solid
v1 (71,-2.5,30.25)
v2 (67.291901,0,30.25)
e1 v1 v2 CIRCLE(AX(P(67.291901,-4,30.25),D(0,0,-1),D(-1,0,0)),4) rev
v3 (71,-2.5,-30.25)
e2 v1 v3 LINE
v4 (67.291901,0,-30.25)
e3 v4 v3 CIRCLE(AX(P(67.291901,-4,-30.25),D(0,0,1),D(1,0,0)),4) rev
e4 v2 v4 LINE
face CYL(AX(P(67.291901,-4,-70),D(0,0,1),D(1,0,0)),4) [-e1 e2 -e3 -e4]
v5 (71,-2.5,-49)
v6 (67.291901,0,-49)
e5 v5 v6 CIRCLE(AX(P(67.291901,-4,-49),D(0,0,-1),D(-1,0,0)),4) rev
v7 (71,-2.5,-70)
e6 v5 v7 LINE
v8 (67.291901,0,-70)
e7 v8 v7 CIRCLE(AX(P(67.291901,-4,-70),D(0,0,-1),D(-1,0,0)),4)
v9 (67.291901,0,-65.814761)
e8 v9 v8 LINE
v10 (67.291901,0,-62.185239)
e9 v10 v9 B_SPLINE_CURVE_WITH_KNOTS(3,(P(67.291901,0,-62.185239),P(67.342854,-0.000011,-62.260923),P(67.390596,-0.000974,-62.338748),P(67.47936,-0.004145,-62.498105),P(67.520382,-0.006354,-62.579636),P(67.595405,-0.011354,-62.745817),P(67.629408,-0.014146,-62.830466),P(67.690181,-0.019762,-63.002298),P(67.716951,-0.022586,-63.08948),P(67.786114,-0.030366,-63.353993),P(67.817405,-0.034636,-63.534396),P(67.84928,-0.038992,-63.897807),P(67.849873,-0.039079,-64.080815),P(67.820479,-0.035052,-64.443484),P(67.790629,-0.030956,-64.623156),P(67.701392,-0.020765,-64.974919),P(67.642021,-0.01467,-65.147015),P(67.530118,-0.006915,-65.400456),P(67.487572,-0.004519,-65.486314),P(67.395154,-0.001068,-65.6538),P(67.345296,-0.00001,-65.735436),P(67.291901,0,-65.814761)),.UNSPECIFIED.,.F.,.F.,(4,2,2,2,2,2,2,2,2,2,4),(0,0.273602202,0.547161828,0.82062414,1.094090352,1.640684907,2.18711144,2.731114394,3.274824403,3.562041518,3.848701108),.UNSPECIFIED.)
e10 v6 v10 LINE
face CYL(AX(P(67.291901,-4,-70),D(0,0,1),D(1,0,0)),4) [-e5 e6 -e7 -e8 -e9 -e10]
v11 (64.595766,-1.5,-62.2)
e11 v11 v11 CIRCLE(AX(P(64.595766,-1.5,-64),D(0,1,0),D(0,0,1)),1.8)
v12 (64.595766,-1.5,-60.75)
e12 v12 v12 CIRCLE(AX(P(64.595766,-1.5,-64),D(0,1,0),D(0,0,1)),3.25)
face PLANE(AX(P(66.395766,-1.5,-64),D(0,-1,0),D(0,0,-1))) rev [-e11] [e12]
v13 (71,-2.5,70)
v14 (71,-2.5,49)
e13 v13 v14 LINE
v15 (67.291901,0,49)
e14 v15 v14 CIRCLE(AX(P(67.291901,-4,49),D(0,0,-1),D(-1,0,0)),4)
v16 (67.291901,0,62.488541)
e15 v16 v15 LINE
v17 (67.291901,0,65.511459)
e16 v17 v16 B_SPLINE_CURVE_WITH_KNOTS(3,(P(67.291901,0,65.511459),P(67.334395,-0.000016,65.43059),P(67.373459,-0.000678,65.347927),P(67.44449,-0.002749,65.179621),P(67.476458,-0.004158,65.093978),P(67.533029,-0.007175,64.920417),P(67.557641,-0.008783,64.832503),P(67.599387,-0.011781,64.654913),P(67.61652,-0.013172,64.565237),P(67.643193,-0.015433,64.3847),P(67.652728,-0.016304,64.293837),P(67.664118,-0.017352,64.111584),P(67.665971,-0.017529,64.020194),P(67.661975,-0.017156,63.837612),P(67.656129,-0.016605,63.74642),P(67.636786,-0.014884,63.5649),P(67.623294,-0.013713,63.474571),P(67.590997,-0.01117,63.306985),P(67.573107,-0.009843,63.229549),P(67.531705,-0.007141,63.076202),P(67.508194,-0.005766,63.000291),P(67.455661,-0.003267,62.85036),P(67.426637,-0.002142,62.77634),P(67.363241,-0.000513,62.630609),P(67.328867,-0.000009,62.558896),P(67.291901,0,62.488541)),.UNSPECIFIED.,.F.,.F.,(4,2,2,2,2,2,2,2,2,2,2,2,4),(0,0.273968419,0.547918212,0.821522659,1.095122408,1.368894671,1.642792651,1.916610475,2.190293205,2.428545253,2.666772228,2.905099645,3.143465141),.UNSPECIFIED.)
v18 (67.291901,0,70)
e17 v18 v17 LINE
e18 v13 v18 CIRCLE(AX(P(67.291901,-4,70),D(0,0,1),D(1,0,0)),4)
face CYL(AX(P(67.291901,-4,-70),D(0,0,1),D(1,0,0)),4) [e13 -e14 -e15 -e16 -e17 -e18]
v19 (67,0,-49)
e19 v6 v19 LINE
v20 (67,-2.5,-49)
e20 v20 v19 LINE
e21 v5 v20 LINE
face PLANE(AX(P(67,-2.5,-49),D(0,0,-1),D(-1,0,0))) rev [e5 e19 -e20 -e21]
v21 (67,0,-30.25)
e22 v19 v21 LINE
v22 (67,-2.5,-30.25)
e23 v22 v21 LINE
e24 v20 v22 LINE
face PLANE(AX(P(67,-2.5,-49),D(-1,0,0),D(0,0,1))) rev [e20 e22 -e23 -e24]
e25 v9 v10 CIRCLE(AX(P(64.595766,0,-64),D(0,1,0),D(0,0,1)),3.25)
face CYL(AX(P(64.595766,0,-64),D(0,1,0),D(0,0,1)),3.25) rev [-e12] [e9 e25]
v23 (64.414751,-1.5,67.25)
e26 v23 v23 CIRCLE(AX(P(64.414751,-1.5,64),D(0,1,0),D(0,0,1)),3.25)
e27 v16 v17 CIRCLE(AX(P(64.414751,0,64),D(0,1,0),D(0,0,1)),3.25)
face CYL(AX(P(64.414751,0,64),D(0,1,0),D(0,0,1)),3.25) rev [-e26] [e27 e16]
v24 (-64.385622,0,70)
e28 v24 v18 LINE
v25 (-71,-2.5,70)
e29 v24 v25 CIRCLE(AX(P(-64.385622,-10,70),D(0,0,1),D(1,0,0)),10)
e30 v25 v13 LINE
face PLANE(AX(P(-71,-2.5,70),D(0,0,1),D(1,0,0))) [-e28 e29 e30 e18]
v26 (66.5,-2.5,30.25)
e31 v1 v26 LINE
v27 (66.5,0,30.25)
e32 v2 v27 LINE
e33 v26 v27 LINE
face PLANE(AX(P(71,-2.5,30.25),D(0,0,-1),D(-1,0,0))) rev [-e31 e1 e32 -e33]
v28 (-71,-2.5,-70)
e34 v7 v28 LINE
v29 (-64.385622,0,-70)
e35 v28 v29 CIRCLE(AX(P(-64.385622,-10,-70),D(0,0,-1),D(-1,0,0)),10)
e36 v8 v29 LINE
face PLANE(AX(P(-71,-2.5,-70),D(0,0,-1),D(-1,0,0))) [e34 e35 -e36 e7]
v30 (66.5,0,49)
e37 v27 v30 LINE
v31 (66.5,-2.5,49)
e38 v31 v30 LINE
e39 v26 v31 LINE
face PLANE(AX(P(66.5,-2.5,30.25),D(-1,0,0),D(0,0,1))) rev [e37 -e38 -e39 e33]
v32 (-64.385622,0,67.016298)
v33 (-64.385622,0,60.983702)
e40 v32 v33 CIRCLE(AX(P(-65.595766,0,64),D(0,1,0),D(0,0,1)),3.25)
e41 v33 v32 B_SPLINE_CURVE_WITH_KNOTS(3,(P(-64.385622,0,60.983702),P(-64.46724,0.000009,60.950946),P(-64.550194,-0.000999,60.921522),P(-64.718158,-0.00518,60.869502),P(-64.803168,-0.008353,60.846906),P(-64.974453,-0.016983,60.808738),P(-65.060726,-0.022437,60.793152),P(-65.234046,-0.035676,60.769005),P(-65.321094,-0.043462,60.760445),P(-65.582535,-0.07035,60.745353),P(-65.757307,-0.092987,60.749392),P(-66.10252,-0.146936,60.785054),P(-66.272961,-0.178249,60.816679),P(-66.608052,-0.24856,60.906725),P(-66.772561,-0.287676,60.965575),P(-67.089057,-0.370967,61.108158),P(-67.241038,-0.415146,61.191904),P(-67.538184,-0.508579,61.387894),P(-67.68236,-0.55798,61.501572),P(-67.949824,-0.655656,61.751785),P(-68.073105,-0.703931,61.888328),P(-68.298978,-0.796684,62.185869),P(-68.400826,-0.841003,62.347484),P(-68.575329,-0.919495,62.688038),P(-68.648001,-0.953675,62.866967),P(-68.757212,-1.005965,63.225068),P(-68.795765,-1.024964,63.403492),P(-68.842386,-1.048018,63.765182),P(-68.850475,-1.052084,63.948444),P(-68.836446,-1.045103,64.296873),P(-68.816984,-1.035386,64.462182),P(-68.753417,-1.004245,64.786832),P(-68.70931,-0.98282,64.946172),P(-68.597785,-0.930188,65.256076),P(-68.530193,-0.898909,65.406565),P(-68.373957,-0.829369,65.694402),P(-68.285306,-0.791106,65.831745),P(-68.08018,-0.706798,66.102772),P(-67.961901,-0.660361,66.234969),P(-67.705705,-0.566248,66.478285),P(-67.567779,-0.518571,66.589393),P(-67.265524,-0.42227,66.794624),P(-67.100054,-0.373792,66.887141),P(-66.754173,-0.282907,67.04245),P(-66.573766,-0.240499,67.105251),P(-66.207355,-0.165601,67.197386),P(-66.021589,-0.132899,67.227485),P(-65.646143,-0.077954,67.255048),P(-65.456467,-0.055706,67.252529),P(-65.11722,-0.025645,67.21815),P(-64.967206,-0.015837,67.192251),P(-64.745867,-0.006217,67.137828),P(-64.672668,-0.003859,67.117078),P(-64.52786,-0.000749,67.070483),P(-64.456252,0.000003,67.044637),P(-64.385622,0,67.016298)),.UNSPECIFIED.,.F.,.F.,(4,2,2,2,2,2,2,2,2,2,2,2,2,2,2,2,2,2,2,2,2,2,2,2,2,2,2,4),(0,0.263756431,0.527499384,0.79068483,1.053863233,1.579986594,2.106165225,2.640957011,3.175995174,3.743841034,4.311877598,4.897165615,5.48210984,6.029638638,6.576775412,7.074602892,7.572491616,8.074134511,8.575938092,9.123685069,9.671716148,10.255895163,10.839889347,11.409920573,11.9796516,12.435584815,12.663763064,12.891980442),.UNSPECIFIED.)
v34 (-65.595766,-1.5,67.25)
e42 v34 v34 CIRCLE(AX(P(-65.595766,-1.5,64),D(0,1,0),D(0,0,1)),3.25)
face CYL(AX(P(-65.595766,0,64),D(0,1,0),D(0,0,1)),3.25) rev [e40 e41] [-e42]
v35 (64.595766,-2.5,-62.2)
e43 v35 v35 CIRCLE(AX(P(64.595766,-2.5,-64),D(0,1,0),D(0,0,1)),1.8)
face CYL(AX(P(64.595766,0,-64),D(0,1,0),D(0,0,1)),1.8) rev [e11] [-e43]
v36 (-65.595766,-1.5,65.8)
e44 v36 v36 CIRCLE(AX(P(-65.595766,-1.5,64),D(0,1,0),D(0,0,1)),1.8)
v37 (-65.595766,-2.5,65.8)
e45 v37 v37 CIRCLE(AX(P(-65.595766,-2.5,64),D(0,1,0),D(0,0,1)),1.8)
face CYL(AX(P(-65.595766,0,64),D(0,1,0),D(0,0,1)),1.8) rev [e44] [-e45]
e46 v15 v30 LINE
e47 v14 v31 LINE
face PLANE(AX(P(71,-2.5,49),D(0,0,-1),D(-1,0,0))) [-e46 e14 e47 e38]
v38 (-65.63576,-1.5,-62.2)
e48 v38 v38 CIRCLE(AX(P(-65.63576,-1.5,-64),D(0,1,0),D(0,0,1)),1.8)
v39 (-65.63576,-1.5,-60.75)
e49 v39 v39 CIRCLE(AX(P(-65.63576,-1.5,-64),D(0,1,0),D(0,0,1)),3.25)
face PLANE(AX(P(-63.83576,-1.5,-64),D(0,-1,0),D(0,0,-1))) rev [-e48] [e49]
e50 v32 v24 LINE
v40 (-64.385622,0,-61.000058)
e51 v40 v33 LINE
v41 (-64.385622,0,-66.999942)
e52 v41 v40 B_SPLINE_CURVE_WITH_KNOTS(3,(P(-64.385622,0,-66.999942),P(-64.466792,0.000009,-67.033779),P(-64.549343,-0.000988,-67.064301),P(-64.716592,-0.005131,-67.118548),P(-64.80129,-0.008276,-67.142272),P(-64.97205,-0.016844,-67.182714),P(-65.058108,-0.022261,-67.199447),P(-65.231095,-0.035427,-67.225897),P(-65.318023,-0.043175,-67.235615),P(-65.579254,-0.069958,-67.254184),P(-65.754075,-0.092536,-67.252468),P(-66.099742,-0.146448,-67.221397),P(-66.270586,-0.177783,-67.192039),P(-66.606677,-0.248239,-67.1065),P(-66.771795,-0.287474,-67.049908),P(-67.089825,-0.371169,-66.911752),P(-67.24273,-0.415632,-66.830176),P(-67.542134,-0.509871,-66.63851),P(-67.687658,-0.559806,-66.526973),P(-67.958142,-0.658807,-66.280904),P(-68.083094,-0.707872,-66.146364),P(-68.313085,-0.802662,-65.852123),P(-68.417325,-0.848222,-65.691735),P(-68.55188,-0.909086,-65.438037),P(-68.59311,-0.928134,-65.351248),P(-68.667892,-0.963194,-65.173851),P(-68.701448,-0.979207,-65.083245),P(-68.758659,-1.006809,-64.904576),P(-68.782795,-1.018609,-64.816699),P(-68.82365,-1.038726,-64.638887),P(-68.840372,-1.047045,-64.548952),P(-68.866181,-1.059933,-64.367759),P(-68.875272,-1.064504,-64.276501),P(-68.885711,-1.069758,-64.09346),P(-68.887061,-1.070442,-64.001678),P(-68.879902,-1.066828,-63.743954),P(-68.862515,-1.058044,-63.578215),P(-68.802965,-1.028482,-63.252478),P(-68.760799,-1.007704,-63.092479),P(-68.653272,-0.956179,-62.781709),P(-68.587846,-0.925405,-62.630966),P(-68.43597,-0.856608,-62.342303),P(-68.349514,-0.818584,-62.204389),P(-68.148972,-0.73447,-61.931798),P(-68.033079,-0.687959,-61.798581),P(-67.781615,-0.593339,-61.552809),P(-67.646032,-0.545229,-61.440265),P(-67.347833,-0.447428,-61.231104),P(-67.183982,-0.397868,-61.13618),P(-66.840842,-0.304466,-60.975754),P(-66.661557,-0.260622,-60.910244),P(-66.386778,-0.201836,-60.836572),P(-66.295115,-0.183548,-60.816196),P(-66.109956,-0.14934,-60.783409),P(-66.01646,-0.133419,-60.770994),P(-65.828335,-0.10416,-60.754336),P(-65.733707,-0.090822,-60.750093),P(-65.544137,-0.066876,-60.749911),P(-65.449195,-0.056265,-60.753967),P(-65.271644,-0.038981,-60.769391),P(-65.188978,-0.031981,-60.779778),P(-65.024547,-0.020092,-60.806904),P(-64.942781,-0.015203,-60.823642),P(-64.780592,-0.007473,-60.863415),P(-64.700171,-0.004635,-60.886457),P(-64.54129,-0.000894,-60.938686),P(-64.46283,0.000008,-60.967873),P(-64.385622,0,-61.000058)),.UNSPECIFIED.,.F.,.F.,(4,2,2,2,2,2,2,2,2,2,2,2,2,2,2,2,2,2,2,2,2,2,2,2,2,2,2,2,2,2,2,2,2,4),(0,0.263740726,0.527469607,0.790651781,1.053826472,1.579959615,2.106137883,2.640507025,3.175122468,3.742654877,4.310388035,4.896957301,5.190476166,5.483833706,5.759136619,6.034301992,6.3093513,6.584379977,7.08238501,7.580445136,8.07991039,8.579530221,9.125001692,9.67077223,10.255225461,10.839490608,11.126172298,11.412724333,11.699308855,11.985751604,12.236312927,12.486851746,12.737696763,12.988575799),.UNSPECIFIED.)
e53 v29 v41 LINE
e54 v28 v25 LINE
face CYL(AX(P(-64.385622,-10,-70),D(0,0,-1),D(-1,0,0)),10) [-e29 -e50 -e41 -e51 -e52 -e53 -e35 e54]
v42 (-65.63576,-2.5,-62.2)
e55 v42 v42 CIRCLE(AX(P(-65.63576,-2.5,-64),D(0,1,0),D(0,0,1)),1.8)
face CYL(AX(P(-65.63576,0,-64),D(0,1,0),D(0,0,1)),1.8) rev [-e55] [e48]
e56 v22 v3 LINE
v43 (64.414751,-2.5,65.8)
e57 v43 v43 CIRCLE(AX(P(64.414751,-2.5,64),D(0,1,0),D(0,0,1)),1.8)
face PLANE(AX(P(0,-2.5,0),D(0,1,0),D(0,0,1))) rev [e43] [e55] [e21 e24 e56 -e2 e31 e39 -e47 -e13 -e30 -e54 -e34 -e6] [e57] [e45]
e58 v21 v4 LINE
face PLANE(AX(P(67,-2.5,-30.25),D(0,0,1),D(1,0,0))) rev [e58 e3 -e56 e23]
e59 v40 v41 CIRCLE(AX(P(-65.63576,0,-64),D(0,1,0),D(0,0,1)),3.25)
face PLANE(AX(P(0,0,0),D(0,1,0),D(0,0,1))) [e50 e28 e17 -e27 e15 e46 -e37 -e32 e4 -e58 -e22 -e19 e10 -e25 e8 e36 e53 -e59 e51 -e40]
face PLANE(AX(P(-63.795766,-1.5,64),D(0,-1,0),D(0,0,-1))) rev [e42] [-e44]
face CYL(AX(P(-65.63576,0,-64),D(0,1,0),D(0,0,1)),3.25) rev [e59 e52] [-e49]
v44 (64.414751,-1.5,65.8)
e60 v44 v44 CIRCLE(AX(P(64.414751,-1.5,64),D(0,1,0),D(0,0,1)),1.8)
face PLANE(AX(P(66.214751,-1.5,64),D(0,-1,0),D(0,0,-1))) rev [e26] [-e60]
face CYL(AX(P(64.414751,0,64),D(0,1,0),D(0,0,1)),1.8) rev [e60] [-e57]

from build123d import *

# Parameters (mm, degrees)
SKETCH1_W                                   = 142
SKETCH1_H                                   = 140
BOSS_EXTRUDE1_DEPTH                         = 2.5
SKETCH6_W                                   = 4
SKETCH6_H                                   = 18.75
CUT_EXTRUDE1_DEPTH                          = 100.735901259
SKETCH7_W                                   = 4.5
SKETCH7_H                                   = 18.75
CUT_EXTRUDE2_DEPTH                          = 100.735901259
CBORE_FOR_M3_CHEESE_HEAD_SCREW1_D           = 3.6
CBORE_FOR_M3_CHEESE_HEAD_SCREW1_CBORE_D     = 6.5
CBORE_FOR_M3_CHEESE_HEAD_SCREW1_CBORE_DEPTH = 1.5
FILLET4_R                                   = 10
FILLET7_R                                   = 4


with BuildPart() as part:
    # Sketch1 → Boss-Extrude1 (new body)
    with BuildSketch(Plane(origin=(0, 0, 0), x_dir=(1, 0, 0), z_dir=(0, 1, 0))):
        Rectangle(SKETCH1_W, SKETCH1_H)
    extrude(amount=-BOSS_EXTRUDE1_DEPTH)

    # Sketch6 → Cut-Extrude1 (cut, through all)
    with BuildSketch(Plane(origin=(0, 0, 0), x_dir=(1, 0, 0), z_dir=(0, 1, 0))):
        with Locations((69, 39.625)):
            Rectangle(SKETCH6_W, SKETCH6_H)
    extrude(amount=-CUT_EXTRUDE1_DEPTH, mode=Mode.SUBTRACT)

    # Sketch7 → Cut-Extrude2 (cut, through all)
    with BuildSketch(Plane(origin=(0, 0, 0), x_dir=(1, 0, 0), z_dir=(0, 1, 0))):
        with Locations((68.75, -39.625)):
            Rectangle(SKETCH7_W, SKETCH7_H)
    extrude(amount=-CUT_EXTRUDE2_DEPTH, mode=Mode.SUBTRACT)

    # CBORE for M3 Cheese Head Screw1 (through all)
    with Locations(Plane(origin=(-65.6357603, 0, -64), x_dir=(0, 0, 1), z_dir=(0, 1, 0))):
        with Locations((0, 0), (0, 130.23152632), (128, 130.05051113), (128, 0.0399943)):
            CounterBoreHole(CBORE_FOR_M3_CHEESE_HEAD_SCREW1_D / 2, CBORE_FOR_M3_CHEESE_HEAD_SCREW1_CBORE_D / 2, CBORE_FOR_M3_CHEESE_HEAD_SCREW1_CBORE_DEPTH)

    # Fillet4
    # the kernel refuses this fillet: 10 mm, written as the material it takes off along each edge
    with BuildSketch(Plane(origin=(-71, 0, 86.535945694), x_dir=(0, -1, 0), z_dir=(0, 0, -1))) as fillet4_piece_1:
        with BuildLine():
            CenterArc((10, -6.614378278), FILLET4_R, 138.590377891, 41.409622109)
            Line((0, -6.614378278), (-0.2, -6.614378278))
            Line((-0.2, -6.614378278), (-0.2, 0))
            Line((-0.2, 0), (0, 0.2))
            ThreePointArc((0, 0.2), (1.25, 0.2), (2.35, 0.132287566))
            Line((2.35, 0.132287566), (2.5, 0))
        make_face()
    extrude(amount=173.071891388, mode=Mode.SUBTRACT)

    # Fillet7
    # the kernel refuses this fillet: 4 mm, written as the material it takes off along each edge
    with BuildSketch(Plane(origin=(71, 0, 39.729751891), x_dir=(-1, 0, 0), z_dir=(0, 0, 1)), Plane(origin=(71, 0, -79.270248109), x_dir=(-1, 0, 0), z_dir=(0, 0, 1))) as fillet7_piece_1:
        with BuildLine():
            CenterArc((3.708099244, 4), FILLET7_R, 202.024312837, 67.975687163)
            Line((0, 2.5), (-0.074161985, 2.47))
            ThreePointArc((-0.074161985, 2.47), (-0.08, 1.25), (-0.08, 0))
            Line((-0.08, 0), (0, -0.08))
            Line((0, -0.08), (3.708099244, -0.08))
            Line((3.708099244, -0.08), (3.708099244, 0))
        make_face()
    extrude(amount=39.540496218, mode=Mode.SUBTRACT)
    with BuildSketch(Plane(origin=(71, 0, -39.520248109), x_dir=(-1, 0, 0), z_dir=(0, 0, 1))) as fillet7_piece_2:
        with BuildLine():
            CenterArc((3.708099244, 4), FILLET7_R, 202.024312837, 67.975687163)
            Line((0, 2.5), (-0.074161985, 2.47))
            ThreePointArc((-0.074161985, 2.47), (-0.08, 1.25), (-0.08, 0))
            Line((-0.08, 0), (0, -0.08))
            Line((0, -0.08), (3.708099244, -0.08))
            Line((3.708099244, -0.08), (3.708099244, 0))
        make_face()
    extrude(amount=79.040496218, mode=Mode.SUBTRACT)


solid = part.part
